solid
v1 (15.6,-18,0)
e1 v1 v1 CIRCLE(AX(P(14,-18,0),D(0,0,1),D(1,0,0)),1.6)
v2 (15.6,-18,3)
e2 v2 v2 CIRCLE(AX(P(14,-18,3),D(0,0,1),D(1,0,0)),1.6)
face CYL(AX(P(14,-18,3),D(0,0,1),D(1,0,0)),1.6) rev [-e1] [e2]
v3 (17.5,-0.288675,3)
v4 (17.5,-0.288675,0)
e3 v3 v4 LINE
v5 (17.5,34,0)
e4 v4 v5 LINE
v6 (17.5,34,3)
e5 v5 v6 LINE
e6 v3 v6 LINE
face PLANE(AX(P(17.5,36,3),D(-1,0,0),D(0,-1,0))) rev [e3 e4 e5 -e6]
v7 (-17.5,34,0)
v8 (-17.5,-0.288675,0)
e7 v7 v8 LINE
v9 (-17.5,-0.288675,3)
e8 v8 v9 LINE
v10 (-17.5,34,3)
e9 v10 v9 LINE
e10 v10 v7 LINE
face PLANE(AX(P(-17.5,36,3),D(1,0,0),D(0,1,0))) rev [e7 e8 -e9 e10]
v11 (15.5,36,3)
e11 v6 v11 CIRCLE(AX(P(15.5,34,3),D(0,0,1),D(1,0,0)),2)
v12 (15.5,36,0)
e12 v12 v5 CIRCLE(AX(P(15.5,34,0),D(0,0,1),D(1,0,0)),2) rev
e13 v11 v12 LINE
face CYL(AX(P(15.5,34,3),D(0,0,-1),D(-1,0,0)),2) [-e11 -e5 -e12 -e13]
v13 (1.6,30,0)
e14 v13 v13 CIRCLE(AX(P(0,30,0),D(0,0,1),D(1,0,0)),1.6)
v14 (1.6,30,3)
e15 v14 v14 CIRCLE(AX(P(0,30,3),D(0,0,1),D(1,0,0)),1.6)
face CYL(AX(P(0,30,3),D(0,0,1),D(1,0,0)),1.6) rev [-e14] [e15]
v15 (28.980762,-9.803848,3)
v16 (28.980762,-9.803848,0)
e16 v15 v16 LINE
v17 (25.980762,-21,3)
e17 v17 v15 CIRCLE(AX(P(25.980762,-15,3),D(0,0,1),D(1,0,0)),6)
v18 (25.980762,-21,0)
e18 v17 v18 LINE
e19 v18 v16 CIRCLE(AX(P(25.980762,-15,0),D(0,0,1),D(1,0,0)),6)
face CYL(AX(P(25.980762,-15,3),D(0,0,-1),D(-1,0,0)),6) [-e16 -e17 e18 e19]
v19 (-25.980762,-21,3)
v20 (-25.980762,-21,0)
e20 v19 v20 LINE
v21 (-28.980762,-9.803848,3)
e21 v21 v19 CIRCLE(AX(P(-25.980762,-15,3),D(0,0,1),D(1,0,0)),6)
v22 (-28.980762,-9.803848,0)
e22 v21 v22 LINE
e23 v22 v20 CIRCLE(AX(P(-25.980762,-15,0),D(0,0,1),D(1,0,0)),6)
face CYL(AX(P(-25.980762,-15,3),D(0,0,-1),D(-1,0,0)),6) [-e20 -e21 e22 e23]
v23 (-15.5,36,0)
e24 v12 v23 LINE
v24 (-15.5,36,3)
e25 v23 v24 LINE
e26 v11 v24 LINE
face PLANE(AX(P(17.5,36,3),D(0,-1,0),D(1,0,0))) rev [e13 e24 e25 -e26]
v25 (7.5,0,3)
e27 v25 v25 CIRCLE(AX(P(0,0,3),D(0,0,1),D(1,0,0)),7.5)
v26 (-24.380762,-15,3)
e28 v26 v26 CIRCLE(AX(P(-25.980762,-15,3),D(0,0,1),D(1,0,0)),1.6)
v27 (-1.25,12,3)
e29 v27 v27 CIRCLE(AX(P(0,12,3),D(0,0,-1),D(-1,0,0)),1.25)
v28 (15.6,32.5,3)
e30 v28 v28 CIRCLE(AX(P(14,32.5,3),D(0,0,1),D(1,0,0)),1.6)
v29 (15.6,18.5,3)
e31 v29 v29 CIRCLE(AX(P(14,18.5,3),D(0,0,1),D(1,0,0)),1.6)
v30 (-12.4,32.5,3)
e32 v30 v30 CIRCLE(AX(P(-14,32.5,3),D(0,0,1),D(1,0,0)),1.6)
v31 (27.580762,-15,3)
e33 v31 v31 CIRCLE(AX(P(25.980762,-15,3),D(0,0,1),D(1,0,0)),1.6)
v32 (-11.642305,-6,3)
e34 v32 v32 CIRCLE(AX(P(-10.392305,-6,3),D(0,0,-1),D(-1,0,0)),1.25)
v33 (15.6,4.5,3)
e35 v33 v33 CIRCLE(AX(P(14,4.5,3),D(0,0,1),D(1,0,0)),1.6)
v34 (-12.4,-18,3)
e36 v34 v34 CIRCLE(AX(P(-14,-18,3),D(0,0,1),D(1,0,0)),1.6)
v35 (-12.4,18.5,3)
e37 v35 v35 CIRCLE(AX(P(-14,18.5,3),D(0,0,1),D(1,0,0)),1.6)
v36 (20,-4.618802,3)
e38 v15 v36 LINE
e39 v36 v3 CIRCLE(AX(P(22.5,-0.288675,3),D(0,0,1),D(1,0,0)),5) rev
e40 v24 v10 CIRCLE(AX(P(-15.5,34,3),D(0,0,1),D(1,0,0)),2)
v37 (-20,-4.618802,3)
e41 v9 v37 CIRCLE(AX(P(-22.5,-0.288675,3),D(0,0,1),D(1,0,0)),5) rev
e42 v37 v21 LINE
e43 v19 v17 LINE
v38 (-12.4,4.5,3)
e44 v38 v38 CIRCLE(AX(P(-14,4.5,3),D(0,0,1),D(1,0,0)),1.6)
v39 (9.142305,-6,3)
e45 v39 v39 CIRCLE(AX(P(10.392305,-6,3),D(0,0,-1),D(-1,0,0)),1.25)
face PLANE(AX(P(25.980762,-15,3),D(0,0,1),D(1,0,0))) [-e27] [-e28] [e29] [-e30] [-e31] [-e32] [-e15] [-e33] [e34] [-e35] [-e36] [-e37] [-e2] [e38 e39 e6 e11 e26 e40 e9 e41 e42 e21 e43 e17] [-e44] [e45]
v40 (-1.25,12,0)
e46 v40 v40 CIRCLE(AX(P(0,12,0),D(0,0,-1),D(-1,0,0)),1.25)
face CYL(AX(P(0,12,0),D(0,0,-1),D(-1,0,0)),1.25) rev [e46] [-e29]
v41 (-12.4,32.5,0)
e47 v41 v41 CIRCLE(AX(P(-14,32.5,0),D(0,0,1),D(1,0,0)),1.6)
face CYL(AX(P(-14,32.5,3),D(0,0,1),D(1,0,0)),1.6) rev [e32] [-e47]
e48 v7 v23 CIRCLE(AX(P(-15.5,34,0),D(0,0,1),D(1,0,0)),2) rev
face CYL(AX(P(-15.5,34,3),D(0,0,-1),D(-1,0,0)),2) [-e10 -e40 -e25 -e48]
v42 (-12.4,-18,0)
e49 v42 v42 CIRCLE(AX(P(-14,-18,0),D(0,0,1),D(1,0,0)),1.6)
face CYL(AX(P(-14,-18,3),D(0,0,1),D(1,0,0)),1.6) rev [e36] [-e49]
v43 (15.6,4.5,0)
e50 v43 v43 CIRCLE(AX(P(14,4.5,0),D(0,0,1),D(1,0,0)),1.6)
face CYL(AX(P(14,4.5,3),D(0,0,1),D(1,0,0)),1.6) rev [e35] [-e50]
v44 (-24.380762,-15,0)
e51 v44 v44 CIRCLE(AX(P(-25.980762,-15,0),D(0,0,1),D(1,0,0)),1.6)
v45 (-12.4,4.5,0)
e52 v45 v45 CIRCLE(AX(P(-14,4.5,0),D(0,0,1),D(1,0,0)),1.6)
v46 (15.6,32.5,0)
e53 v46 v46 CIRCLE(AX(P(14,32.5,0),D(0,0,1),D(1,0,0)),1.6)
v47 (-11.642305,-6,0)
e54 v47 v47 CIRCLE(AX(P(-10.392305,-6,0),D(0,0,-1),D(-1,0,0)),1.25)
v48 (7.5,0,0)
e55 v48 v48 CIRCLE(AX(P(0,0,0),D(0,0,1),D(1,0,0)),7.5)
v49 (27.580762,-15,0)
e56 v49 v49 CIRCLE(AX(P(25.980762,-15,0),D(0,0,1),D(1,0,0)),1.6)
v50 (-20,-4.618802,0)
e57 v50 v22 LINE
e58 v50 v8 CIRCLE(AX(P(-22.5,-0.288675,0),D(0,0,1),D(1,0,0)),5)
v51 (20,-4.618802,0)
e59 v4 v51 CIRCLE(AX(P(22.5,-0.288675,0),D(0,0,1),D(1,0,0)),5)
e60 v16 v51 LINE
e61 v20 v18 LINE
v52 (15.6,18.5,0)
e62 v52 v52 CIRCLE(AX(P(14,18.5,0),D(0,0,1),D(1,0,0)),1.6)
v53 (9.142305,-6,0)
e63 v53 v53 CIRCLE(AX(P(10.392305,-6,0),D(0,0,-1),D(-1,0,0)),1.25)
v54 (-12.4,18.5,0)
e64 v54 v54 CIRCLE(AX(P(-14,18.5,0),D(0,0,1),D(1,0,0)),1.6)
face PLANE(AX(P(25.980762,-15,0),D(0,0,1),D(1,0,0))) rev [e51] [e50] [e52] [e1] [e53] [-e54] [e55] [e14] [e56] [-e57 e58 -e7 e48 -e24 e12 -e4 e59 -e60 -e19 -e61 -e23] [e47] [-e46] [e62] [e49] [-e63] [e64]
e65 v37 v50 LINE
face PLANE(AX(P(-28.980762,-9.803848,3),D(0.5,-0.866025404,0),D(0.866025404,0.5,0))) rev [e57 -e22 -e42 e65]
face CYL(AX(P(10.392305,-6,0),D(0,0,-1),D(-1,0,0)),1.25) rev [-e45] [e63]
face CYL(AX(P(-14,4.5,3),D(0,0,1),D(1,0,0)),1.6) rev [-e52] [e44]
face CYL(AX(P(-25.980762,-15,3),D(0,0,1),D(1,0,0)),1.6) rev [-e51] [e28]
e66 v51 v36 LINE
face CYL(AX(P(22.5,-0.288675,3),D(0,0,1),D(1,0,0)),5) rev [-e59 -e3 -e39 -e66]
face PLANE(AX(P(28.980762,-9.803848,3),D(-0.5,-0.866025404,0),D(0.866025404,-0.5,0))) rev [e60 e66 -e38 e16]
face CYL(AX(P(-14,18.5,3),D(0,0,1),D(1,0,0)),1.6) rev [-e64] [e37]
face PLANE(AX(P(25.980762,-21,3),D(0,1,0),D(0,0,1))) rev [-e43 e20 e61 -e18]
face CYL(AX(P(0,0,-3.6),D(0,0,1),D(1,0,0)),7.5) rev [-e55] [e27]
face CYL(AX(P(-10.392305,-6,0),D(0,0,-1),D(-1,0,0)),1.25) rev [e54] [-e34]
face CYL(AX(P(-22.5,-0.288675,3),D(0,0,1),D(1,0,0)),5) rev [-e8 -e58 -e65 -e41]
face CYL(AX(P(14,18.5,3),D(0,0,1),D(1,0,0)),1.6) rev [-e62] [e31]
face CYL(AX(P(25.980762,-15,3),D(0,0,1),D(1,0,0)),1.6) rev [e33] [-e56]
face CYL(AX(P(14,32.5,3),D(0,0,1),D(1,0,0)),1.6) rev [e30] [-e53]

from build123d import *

# Parameters (mm, degrees)
CHAMFER1_SIZE                  = 1
CHAMFER1_SIZE2                 = 2.747477419
CIRPATTERN2_COUNT              = 3
BOSS_EXTRUDE1_DEPTH            = 3
SKETCH4_R                      = 7.5
CUT_EXTRUDE1_DEPTH             = 49.603797643
SKETCH6_W                      = 1.25
SKETCH6_H                      = 3
M3X0_5_TAPPED_HOLE2_AT_2_COUNT = 2
M3X0_5_TAPPED_HOLE2_AT_2_PITCH = 20.784609691
M3X0_5_TAPPED_HOLE2_AT_3_COUNT = 2
M3X0_5_TAPPED_HOLE2_AT_3_PITCH = 20.784609691
FILLET1_R                      = 5
FILLET2_R                      = 2
SKETCH9_W                      = 1.6
SKETCH9_H                      = 6.6
M3_CLEARANCE_HOLE3_AT_2_COUNT  = 2
M3_CLEARANCE_HOLE3_AT_2_PITCH  = 14
M3_CLEARANCE_HOLE3_AT_3_COUNT  = 2
M3_CLEARANCE_HOLE3_AT_3_PITCH  = 28
M3_CLEARANCE_HOLE3_AT_4_COUNT  = 2
M3_CLEARANCE_HOLE3_AT_4_PITCH  = 50.5
M3_CLEARANCE_HOLE3_AT_5_COUNT  = 2
M3_CLEARANCE_HOLE3_AT_5_PITCH  = 57.742964939
M3_CLEARANCE_HOLE3_AT_6_COUNT  = 2
M3_CLEARANCE_HOLE3_AT_6_PITCH  = 39.597979746
M3_CLEARANCE_HOLE3_AT_7_COUNT  = 2
M3_CLEARANCE_HOLE3_AT_7_PITCH  = 31.304951685
M3_CLEARANCE_HOLE3_AT_8_COUNT  = 2
M3_CLEARANCE_HOLE3_AT_8_PITCH  = 28
SKETCH13_W                     = 1.6
SKETCH13_H                     = 6.6
M3_CLEARANCE_HOLE2_AT_2_COUNT  = 2
M3_CLEARANCE_HOLE2_AT_2_PITCH  = 51.961524227
M3_CLEARANCE_HOLE2_AT_3_COUNT  = 2
M3_CLEARANCE_HOLE2_AT_3_PITCH  = 51.961524227
CHAMFER2_SIZE                  = 0.4
CHAMFER3_SIZE                  = 0.4
CHAMFER4_SIZE                  = 0.4


with BuildPart() as part:
    # Sketch3 → Revolve1 (revolve)
    with BuildSketch(Plane(origin=(0, 0, 0), x_dir=(0, 0, -1), z_dir=(1, 0, 0)), mode=Mode.PRIVATE) as revolve1_sk:
        with BuildLine():
            Line((0, 31.6), (0.233939444, 31.6))
            ThreePointArc((0.233939444, 31.6), (1.585065492, 33.262066557), (3.6, 33.988734135))
            Line((3.6, 33.988734135), (3.6, 35.988734135))
            Line((3.6, 35.988734135), (0, 35.988734135))
            Line((0, 35.988734135), (0, 31.6))
        make_face()
    revolve(revolve1_sk.sketch.rotate(Axis((0, 30, 0), (0, 0, -1)), 90), axis=Axis((0, 30, 0), (0, 0, -1)))

    # Chamfer1
    chamfer1_edges = [part.edges().sort_by_distance(p)[0] for p in [
        (-5.988734135, 30, -3.6),
    ]]
    chamfer1_side = [part.faces().sort_by_distance(p)[0] for p in [
        (-4.158121116, 30, -3.6),
    ]]
    chamfer(chamfer1_edges, length=CHAMFER1_SIZE, length2=CHAMFER1_SIZE2, reference=chamfer1_side[0])


with BuildPart() as cirpattern2_1:
    # CirPattern2: pattern copy
    add(part.part.rotate(Axis((0, 0, 0), (0, 0, 1)), 1 * 360 / CIRPATTERN2_COUNT))

    # Chamfer4
    # the kernel refuses this chamfer: 0.4 mm, written as the material it takes off along each edge
    with BuildSketch(Plane(origin=(-25.980762114, -15, 0), x_dir=(-0.5000000000000001, 0.8660254037844387, 0), z_dir=(-0.8660254037844387, -0.5000000000000001, 0))) as chamfer4_piece_1:
        Polygon((5.988734135, CHAMFER4_SIZE), (5.988734135 - CHAMFER4_SIZE, 0), (5.988734135, 0), align=None)
    revolve(axis=Axis((-25.980762114, -15, 0), (0, 0, -1)), mode=Mode.SUBTRACT)
    with BuildSketch(Plane(origin=(-25.980762114, -15, 0), x_dir=(-0.4999999999999992, 0.866025403784439, 0), z_dir=(-0.866025403784439, -0.4999999999999992, 0))) as chamfer4_piece_2:
        Polygon((1.6, CHAMFER4_SIZE), (1.6 + CHAMFER4_SIZE, 0), (1.6, 0), align=None)
    revolve(axis=Axis((-25.980762114, -15, 0), (0, 0, -1)), mode=Mode.SUBTRACT)


with BuildPart() as cirpattern2_2:
    # CirPattern2: pattern copy
    add(part.part.rotate(Axis((0, 0, 0), (0, 0, 1)), 2 * 360 / CIRPATTERN2_COUNT))

    # Chamfer2
    # the kernel refuses this chamfer: 0.4 mm, written as the material it takes off along each edge
    with BuildSketch(Plane(origin=(25.980762114, -15, 0), x_dir=(-0.5000000000000006, -0.8660254037844384, 0), z_dir=(0.8660254037844384, -0.5000000000000006, 0))) as chamfer2_piece_1:
        Polygon((5.988734135, CHAMFER2_SIZE), (5.988734135 - CHAMFER2_SIZE, 0), (5.988734135, 0), align=None)
    revolve(axis=Axis((25.980762114, -15, 0), (0, 0, -1)), mode=Mode.SUBTRACT)
    with BuildSketch(Plane(origin=(25.980762114, -15, 0), x_dir=(-0.5000000000000004, -0.8660254037844384, 0), z_dir=(0.8660254037844384, -0.5000000000000004, 0))) as chamfer2_piece_2:
        Polygon((1.6, CHAMFER2_SIZE), (1.6 + CHAMFER2_SIZE, 0), (1.6, 0), align=None)
    revolve(axis=Axis((25.980762114, -15, 0), (0, 0, -1)), mode=Mode.SUBTRACT)


with BuildPart() as body_4:
    # Sketch1 → Boss-Extrude1 (new body)
    with BuildSketch(Plane.XY):
        with BuildLine():
            Line((25.980762114, -21), (-25.980762114, -21))
            ThreePointArc((-25.980762114, -21), (-31.776317071, -16.552914271), (-28.980762114, -9.803847577))
            Line((-28.980762114, -9.803847577), (-17.5, -3.175426481))
            Line((-17.5, -3.175426481), (-17.5, 36))
            Line((-17.5, 36), (17.5, 36))
            Line((17.5, 36), (17.5, -3.175426481))
            Line((17.5, -3.175426481), (28.980762114, -9.803847577))
            ThreePointArc((28.980762114, -9.803847577), (31.776317071, -16.552914271), (25.980762114, -21))
        make_face()
    extrude(amount=BOSS_EXTRUDE1_DEPTH)

    # Sketch4 → Cut-Extrude1 (cut, through all)
    with BuildSketch(Plane.XY.offset(3)):
        Circle(SKETCH4_R)
    extrude(amount=-CUT_EXTRUDE1_DEPTH, mode=Mode.SUBTRACT)

    # Sketch6 → M3x0.5 Tapped Hole2 (revolve, cut)
    with BuildSketch(Plane(origin=(-10.392304845, -6, 0), x_dir=(0, 1, 0), z_dir=(1, 0, 0))):
        with Locations((0.625, 1.5)):
            Rectangle(SKETCH6_W, SKETCH6_H)
    m3x0_5_tapped_hole2 = revolve(axis=Axis((-10.392304845, -6, -6.35), (0, 0, 1)), mode=Mode.SUBTRACT)

    # M3x0.5 Tapped Hole2 at 2: M3x0.5 Tapped Hole2 ×2
    with Locations(*[Vector(0.49999999999999795, 0.8660254037844399, 0) * (i * M3X0_5_TAPPED_HOLE2_AT_2_PITCH) for i in range(1, M3X0_5_TAPPED_HOLE2_AT_2_COUNT)]):
        add(m3x0_5_tapped_hole2, mode=Mode.SUBTRACT)

    # M3x0.5 Tapped Hole2 at 3: M3x0.5 Tapped Hole2 ×2
    with Locations(*[(i * M3X0_5_TAPPED_HOLE2_AT_3_PITCH, 0, 0) for i in range(1, M3X0_5_TAPPED_HOLE2_AT_3_COUNT)]):
        add(m3x0_5_tapped_hole2, mode=Mode.SUBTRACT)

    # Fillet1
    fillet1_edges = [body_4.edges().sort_by_distance(p)[0] for p in [
        (-17.5, -3.175426481, 1.5),
        (17.5, -3.175426481, 1.5),
    ]]
    fillet(fillet1_edges, radius=FILLET1_R)

    # Fillet2
    fillet2_edges = [body_4.edges().sort_by_distance(p)[0] for p in [
        (-17.5, 36, 1.5),
        (17.5, 36, 1.5),
    ]]
    fillet(fillet2_edges, radius=FILLET2_R)

    # Sketch9 → M3 Clearance Hole3 (revolve, cut)
    with BuildSketch(Plane(origin=(14, 32.5, 3), x_dir=(0, -1, 0), z_dir=(1, 0, 0))):
        with Locations((0.8, 3.3)):
            Rectangle(SKETCH9_W, SKETCH9_H)
    m3_clearance_hole3 = revolve(axis=Axis((14, 32.5, 9.35), (0, 0, -1)), mode=Mode.SUBTRACT)

    # M3 Clearance Hole3 at 2: M3 Clearance Hole3 ×2
    with Locations(*[(0, -i * M3_CLEARANCE_HOLE3_AT_2_PITCH, 0) for i in range(1, M3_CLEARANCE_HOLE3_AT_2_COUNT)]):
        add(m3_clearance_hole3, mode=Mode.SUBTRACT)

    # M3 Clearance Hole3 at 3: M3 Clearance Hole3 ×2
    with Locations(*[(0, -i * M3_CLEARANCE_HOLE3_AT_3_PITCH, 0) for i in range(1, M3_CLEARANCE_HOLE3_AT_3_COUNT)]):
        add(m3_clearance_hole3, mode=Mode.SUBTRACT)

    # M3 Clearance Hole3 at 4: M3 Clearance Hole3 ×2
    with Locations(*[(0, -i * M3_CLEARANCE_HOLE3_AT_4_PITCH, 0) for i in range(1, M3_CLEARANCE_HOLE3_AT_4_COUNT)]):
        add(m3_clearance_hole3, mode=Mode.SUBTRACT)

    # M3 Clearance Hole3 at 5: M3 Clearance Hole3 ×2
    with Locations(*[Vector(-0.48490755591360857, -0.8745654133441881, 0) * (i * M3_CLEARANCE_HOLE3_AT_5_PITCH) for i in range(1, M3_CLEARANCE_HOLE3_AT_5_COUNT)]):
        add(m3_clearance_hole3, mode=Mode.SUBTRACT)

    # M3 Clearance Hole3 at 6: M3 Clearance Hole3 ×2
    with Locations(*[Vector(-0.7071067811865479, -0.7071067811865472, 0) * (i * M3_CLEARANCE_HOLE3_AT_6_PITCH) for i in range(1, M3_CLEARANCE_HOLE3_AT_6_COUNT)]):
        add(m3_clearance_hole3, mode=Mode.SUBTRACT)

    # M3 Clearance Hole3 at 7: M3 Clearance Hole3 ×2
    with Locations(*[Vector(-0.8944271909999161, -0.4472135954999577, 0) * (i * M3_CLEARANCE_HOLE3_AT_7_PITCH) for i in range(1, M3_CLEARANCE_HOLE3_AT_7_COUNT)]):
        add(m3_clearance_hole3, mode=Mode.SUBTRACT)

    # M3 Clearance Hole3 at 8: M3 Clearance Hole3 ×2
    with Locations(*[(-i * M3_CLEARANCE_HOLE3_AT_8_PITCH, 0, 0) for i in range(1, M3_CLEARANCE_HOLE3_AT_8_COUNT)]):
        add(m3_clearance_hole3, mode=Mode.SUBTRACT)

    # Sketch13 → M3 Clearance Hole2 (revolve, cut)
    with BuildSketch(Plane(origin=(0, 30, 3), x_dir=(0, -1, 0), z_dir=(1, 0, 0))):
        with Locations((0.8, 3.3)):
            Rectangle(SKETCH13_W, SKETCH13_H)
    m3_clearance_hole2 = revolve(axis=Axis((0, 30, 9.35), (0, 0, -1)), mode=Mode.SUBTRACT)

    # M3 Clearance Hole2 at 2: M3 Clearance Hole2 ×2
    with Locations(*[Vector(0.49999999999999795, -0.8660254037844398, 0) * (i * M3_CLEARANCE_HOLE2_AT_2_PITCH) for i in range(1, M3_CLEARANCE_HOLE2_AT_2_COUNT)]):
        add(m3_clearance_hole2, mode=Mode.SUBTRACT)

    # M3 Clearance Hole2 at 3: M3 Clearance Hole2 ×2
    with Locations(*[Vector(-0.49999999999999784, -0.8660254037844399, 0) * (i * M3_CLEARANCE_HOLE2_AT_3_PITCH) for i in range(1, M3_CLEARANCE_HOLE2_AT_3_COUNT)]):
        add(m3_clearance_hole2, mode=Mode.SUBTRACT)


with BuildPart() as part_1:
    add(part.part)

    # Chamfer3
    # the kernel refuses this chamfer: 0.4 mm, written as the material it takes off along each edge
    with BuildSketch(Plane(origin=(0, 30, 0), x_dir=(1, 0, 0), z_dir=(0, 1, 0))) as chamfer3_piece_1:
        Polygon((5.988734135, CHAMFER3_SIZE), (5.988734135 - CHAMFER3_SIZE, 0), (5.988734135, 0), align=None)
    revolve(axis=Axis((0, 30, 0), (0, 0, -1)), mode=Mode.SUBTRACT)
    with BuildSketch(Plane(origin=(0, 30, 0), x_dir=(1, 0, 0), z_dir=(0, 1, 0))) as chamfer3_piece_2:
        Polygon((1.6, CHAMFER3_SIZE), (1.6 + CHAMFER3_SIZE, 0), (1.6, 0), align=None)
    revolve(axis=Axis((0, 30, 0), (0, 0, -1)), mode=Mode.SUBTRACT)


solid = body_4.part
